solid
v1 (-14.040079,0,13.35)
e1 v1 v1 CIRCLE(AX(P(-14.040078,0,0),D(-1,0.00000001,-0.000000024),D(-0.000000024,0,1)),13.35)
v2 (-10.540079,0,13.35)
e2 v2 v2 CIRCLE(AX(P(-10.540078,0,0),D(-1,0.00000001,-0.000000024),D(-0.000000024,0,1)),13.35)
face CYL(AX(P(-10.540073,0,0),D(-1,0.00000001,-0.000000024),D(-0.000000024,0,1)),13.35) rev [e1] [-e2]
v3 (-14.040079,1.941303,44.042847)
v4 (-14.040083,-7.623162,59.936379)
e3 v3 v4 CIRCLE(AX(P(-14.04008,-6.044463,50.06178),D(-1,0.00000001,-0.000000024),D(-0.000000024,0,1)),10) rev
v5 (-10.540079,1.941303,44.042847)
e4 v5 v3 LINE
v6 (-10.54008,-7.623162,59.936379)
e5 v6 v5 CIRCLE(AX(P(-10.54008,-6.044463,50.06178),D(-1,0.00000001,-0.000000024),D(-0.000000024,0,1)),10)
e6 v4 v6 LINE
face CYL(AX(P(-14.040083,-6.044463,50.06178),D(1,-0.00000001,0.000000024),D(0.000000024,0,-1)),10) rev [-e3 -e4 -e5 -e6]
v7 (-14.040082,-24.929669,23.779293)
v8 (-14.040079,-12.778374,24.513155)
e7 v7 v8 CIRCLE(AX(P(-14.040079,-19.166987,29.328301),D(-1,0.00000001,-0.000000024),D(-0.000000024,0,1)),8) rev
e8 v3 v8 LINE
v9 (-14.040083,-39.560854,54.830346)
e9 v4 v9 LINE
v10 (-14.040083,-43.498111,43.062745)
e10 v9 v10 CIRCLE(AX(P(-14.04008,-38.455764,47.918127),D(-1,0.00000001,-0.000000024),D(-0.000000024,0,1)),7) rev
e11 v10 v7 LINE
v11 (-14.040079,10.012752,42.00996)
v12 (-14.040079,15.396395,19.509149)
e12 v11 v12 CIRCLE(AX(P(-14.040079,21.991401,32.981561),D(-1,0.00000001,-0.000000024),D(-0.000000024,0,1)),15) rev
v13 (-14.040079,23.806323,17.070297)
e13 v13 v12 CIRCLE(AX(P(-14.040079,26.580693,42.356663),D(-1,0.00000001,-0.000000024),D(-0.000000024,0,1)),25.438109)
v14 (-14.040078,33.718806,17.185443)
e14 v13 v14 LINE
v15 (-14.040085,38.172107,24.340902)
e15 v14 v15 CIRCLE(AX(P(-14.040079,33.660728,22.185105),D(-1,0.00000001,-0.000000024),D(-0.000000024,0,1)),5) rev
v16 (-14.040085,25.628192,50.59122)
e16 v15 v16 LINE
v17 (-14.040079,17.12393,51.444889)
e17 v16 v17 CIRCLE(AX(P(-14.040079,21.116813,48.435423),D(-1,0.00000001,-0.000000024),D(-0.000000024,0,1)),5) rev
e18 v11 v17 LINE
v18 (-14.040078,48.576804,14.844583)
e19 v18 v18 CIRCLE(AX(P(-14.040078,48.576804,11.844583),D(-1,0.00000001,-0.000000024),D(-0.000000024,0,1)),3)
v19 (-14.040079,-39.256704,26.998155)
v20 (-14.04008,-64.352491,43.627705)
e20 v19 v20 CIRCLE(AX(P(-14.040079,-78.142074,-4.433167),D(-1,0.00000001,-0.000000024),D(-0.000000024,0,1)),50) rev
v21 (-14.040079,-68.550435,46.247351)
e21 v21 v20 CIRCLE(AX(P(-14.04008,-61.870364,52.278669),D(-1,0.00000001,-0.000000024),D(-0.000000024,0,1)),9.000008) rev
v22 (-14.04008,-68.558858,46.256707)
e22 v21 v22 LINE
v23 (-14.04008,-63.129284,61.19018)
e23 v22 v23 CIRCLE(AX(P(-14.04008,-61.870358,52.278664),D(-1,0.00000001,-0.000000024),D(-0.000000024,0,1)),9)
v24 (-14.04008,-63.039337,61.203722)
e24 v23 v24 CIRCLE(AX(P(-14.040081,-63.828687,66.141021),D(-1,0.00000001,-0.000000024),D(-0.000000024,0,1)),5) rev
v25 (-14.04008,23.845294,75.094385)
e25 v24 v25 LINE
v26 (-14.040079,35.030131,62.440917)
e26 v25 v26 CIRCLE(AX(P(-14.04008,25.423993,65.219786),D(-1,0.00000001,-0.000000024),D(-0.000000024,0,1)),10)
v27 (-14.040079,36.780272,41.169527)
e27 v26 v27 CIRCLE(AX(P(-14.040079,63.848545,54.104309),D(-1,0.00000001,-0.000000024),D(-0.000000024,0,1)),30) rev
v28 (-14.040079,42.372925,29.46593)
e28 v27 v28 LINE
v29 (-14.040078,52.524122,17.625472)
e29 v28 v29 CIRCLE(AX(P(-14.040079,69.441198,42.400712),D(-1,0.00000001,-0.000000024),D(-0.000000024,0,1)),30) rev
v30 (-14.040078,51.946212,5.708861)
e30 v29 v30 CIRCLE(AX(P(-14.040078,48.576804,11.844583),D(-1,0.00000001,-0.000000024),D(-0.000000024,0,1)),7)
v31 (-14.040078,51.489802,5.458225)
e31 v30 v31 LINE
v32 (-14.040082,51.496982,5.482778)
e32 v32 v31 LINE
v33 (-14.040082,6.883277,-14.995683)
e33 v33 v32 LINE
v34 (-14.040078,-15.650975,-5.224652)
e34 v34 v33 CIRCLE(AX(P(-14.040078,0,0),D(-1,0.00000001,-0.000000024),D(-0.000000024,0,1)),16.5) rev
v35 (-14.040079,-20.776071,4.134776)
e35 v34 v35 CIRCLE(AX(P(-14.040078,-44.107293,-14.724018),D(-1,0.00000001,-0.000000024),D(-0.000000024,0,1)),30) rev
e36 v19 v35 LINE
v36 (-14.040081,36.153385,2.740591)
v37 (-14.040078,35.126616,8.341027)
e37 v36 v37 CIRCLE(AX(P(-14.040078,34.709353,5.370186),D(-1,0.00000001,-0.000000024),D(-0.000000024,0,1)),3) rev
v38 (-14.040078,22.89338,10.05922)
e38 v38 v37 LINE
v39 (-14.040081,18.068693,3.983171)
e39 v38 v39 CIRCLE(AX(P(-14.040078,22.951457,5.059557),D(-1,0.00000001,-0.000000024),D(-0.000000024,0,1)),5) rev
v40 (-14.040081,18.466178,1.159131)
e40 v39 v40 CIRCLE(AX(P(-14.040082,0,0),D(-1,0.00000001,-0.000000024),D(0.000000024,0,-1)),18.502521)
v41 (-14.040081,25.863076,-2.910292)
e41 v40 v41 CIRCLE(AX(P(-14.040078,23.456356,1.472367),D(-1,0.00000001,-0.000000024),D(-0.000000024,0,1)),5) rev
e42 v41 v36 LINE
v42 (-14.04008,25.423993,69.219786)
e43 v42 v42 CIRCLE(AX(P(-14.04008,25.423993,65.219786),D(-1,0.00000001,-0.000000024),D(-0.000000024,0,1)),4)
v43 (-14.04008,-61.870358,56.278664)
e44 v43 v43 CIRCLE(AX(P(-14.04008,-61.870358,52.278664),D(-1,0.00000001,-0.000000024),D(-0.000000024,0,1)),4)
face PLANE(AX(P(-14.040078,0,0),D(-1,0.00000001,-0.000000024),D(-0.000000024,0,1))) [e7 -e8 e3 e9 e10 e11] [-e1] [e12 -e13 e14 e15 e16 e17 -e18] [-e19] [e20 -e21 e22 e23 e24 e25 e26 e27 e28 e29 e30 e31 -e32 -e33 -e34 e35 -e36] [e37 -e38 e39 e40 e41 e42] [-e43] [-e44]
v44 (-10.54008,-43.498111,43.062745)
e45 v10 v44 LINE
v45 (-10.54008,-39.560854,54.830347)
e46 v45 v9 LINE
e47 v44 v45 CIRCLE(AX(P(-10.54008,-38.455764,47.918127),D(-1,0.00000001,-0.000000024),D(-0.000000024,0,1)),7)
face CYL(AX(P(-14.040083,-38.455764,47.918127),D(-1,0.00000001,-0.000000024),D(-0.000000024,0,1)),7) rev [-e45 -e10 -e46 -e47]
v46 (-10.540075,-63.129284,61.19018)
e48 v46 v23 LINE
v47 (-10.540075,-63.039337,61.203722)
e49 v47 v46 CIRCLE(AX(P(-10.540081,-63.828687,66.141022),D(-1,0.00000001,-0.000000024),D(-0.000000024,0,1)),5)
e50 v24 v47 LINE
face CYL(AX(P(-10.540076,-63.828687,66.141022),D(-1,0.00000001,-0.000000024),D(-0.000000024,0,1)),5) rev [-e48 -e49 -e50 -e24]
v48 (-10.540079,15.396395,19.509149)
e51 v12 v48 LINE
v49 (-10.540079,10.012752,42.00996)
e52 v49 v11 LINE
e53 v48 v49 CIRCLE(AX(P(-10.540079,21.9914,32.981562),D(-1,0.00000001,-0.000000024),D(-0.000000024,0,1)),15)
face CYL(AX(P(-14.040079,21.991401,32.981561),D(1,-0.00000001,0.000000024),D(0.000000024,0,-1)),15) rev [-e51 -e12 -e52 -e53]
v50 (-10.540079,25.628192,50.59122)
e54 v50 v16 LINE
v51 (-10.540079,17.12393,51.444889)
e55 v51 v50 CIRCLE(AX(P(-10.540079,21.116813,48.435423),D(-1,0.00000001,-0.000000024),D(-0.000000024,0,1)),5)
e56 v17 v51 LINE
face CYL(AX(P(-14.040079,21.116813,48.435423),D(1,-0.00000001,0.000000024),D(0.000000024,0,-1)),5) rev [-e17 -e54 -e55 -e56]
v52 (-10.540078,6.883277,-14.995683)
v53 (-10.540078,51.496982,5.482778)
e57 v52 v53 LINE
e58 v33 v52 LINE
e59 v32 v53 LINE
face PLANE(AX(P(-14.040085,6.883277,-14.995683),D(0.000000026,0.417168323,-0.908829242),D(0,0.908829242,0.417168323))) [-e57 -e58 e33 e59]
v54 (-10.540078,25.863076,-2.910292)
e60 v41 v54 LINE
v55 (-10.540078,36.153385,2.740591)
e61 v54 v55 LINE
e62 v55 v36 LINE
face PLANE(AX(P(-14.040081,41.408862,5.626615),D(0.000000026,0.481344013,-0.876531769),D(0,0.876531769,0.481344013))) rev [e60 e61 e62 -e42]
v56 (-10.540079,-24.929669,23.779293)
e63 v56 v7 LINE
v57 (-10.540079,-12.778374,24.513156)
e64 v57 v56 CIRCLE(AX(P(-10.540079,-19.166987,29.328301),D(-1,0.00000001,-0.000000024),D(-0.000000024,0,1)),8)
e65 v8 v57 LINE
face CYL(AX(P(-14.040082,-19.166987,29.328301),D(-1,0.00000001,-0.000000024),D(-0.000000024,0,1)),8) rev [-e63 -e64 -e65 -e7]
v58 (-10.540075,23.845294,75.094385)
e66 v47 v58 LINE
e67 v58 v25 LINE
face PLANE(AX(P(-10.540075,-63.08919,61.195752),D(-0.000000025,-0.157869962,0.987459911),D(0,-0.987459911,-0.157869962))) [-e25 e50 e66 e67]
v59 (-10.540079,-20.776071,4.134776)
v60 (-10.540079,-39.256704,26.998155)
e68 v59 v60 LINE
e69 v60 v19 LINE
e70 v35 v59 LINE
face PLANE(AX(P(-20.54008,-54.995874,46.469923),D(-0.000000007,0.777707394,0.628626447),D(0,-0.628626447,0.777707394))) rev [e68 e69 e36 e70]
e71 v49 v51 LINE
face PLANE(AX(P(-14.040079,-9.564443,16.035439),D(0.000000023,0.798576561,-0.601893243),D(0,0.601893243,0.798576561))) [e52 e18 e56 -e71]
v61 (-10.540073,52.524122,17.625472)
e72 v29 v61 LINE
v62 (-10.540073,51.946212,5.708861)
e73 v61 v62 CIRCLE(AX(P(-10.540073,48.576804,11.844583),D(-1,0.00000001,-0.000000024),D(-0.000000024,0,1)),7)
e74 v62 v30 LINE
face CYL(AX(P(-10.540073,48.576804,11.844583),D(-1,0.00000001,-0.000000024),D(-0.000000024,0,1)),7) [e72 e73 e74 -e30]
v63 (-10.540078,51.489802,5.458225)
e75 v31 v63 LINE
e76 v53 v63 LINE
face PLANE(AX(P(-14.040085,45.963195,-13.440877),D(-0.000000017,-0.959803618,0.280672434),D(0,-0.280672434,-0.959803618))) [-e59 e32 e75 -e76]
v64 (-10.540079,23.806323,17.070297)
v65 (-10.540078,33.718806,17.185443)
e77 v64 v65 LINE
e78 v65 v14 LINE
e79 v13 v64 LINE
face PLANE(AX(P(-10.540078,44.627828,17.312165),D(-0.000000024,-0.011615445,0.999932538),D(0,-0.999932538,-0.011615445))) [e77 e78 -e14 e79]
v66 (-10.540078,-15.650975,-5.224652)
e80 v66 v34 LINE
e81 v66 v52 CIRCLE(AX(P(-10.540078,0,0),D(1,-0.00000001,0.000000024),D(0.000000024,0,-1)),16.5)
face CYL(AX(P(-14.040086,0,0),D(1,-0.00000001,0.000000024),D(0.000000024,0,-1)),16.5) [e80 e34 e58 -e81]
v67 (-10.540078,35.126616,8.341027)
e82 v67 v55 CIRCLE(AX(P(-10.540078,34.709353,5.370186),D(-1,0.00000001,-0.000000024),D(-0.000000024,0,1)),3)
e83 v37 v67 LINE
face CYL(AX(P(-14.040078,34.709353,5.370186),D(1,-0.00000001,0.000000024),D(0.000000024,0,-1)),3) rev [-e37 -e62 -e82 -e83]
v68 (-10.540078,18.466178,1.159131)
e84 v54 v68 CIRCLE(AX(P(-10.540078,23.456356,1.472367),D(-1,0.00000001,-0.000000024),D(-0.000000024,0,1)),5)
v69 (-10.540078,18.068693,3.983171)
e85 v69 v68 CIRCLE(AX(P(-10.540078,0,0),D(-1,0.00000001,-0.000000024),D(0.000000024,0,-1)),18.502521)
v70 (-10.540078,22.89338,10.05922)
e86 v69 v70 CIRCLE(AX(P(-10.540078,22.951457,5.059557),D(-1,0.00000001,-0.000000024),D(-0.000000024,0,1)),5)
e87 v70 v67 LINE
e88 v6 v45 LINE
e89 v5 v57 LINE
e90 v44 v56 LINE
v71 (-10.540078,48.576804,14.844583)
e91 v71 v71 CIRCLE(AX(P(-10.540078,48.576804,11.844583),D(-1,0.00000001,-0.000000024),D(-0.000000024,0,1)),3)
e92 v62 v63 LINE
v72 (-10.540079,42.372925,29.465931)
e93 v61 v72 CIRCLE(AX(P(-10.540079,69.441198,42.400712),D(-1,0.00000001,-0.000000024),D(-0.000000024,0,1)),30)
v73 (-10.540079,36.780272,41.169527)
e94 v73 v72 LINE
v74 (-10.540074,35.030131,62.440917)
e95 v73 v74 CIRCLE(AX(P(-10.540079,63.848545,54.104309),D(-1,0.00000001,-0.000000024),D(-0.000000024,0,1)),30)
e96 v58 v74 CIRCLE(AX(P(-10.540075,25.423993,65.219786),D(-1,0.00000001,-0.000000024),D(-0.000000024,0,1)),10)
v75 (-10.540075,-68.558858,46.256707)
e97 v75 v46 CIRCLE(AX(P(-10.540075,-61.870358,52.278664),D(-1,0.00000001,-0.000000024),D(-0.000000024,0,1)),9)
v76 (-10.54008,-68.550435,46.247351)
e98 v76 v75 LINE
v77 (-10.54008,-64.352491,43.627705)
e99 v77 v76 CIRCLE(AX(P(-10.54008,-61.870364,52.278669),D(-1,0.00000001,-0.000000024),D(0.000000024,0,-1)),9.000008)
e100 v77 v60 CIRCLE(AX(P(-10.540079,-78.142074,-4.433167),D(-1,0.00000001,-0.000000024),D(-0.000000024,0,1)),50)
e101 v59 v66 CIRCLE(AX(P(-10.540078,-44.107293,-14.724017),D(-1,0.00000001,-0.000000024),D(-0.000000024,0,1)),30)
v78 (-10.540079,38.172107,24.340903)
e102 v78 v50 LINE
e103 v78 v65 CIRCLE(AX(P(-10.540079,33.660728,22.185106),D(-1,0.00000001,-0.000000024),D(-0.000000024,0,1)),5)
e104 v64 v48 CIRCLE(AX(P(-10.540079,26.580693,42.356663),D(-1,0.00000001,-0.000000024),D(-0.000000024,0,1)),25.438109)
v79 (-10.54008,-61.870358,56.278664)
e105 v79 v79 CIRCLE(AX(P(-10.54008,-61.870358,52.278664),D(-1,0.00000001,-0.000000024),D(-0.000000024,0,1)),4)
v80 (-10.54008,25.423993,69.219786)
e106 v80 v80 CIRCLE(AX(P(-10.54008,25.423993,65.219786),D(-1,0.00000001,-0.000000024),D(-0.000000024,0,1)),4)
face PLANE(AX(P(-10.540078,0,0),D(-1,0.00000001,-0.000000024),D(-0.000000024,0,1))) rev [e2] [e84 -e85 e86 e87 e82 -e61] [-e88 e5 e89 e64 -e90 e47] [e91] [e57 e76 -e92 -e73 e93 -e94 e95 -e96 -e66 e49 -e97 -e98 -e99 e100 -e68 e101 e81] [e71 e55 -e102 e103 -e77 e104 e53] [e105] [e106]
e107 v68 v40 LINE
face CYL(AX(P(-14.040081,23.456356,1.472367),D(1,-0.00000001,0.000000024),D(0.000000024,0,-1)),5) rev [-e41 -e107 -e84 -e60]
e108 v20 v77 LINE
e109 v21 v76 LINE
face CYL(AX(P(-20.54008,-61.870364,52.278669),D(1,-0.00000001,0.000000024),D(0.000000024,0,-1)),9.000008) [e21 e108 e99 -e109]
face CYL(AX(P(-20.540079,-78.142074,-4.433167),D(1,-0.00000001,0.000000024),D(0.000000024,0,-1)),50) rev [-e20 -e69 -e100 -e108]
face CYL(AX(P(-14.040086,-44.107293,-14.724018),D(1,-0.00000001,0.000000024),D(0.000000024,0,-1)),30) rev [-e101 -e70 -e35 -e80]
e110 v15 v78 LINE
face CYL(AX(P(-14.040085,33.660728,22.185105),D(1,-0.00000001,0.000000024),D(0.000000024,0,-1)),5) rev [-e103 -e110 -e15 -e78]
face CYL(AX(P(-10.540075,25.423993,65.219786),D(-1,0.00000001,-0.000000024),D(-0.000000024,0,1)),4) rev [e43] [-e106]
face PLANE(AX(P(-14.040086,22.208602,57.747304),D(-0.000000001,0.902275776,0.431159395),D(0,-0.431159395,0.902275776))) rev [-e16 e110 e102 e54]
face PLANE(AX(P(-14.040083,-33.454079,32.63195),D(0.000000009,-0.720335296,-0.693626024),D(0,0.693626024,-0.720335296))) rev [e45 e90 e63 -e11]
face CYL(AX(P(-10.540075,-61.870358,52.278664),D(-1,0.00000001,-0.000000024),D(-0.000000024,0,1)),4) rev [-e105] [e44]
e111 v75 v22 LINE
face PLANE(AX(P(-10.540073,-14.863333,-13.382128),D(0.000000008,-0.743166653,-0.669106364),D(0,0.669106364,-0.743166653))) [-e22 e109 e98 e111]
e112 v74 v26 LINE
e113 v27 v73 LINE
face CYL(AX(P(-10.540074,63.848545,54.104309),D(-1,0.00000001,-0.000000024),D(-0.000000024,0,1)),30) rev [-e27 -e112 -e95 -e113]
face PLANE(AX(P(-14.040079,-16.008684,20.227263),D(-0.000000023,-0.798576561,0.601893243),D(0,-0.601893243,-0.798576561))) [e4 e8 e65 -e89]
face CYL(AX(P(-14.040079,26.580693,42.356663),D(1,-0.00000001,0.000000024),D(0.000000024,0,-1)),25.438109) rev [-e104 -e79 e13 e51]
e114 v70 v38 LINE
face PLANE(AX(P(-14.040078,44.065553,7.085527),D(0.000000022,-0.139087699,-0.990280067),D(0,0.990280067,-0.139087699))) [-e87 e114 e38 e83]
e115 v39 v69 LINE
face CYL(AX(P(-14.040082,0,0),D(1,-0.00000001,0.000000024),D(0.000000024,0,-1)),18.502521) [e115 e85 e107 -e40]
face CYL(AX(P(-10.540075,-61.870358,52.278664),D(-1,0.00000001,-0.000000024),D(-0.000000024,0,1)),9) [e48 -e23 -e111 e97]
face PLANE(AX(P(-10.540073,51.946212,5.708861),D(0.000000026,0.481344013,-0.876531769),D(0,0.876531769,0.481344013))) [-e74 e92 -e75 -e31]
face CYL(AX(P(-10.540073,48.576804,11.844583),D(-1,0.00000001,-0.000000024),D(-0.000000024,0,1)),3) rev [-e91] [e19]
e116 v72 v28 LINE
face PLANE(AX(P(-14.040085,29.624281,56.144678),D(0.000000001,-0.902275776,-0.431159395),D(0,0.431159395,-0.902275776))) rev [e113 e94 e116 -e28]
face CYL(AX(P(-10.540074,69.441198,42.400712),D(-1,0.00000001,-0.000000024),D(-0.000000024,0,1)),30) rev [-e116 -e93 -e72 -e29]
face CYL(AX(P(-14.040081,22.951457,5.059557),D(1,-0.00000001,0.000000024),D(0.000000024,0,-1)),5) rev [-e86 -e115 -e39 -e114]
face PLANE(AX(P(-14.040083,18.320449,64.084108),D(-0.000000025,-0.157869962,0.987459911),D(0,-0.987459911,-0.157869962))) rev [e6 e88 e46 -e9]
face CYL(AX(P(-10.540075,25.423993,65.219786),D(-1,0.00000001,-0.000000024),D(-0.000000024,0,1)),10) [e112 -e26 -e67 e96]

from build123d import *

# Parameters (mm, degrees)
SZKIC7_W                    = 139.266717109
SZKIC7_H                    = 160.929145335
DODANIE_WYCI_GNI_CIE2_DEPTH = 3.5
SZKIC8_R                    = 13.35
SZKIC8_R_2                  = 3
SZKIC8_R_3                  = 4
WYTNIJ_WYCI_GNI_CIE4_DEPTH  = 129.67294198
SZKIC9_W                    = 153.512733411
SZKIC9_H                    = 228.238191402
WYTNIJ_WYCI_GNI_CIE5_DEPTH  = 129.67294198
WYTNIJ_WYCI_GNI_CIE14_DEPTH = 104.40635377
WYTNIJ_WYCI_GNI_CIE15_DEPTH = 104.40635377
ZAOKR_GLENIE11_R            = 30
DODANIE_WYCI_GNI_CIE5_DEPTH = 3.5
ZAOKR_GLENIE14_R            = 5
WYTNIJ_WYCI_GNI_CIE17_DEPTH = 104.40635377
DODANIE_WYCI_GNI_CIE6_DEPTH = 3.5
ZAOKR_GLENIE24_R            = 5
DODANIE_WYCI_GNI_CIE7_DEPTH = 3.5
WYTNIJ_WYCI_GNI_CIE19_START = -10
WYTNIJ_WYCI_GNI_CIE19_DEPTH = 10
ZAOKR_GLENIE45_R            = 50
ZAOKR_GLENIE46_R            = 5
ZAOKR_GLENIE49_R            = 7
DODANIE_WYCI_GNI_CIE8_DEPTH = 3.5
ZAOKR_GLENIE61_R            = 3
ZAOKR_GLENIE62_R            = 5
WYTNIJ_WYCI_GNI_CIE21_DEPTH = 104.40635377
ZAOKR_GLENIE69_R            = 30
ZAOKR_GLENIE72_R            = 10
ZAOKR_GLENIE75_R            = 5
ZAOKR_GLENIE76_R            = 8
ZAOKR_GLENIE77_R            = 15


with BuildPart() as part:
    # Szkic7 → Dodanie-wyciągnięcie2 (new body)
    with BuildSketch(Plane(origin=(-10.54007835, 1.1e-07, -2.52e-07), x_dir=(-2.3878901828089376e-08, 0, 0.9999999999999998), z_dir=(-0.9999999999999998, 1.0404070824565065e-08, -2.387890182808938e-08))):
        with Locations((21.253283054, -10.552427612)):
            Rectangle(SZKIC7_W, SZKIC7_H)
    extrude(amount=DODANIE_WYCI_GNI_CIE2_DEPTH)

    # Szkic8 → Wytnij-wyciągnięcie4 (cut, through all)
    with BuildSketch(Plane(origin=(-14.04007835, 1.46e-07, -3.35e-07), x_dir=(-2.3878901828089376e-08, 0, 0.9999999999999998), z_dir=(-0.9999999999999998, 1.0404070821366677e-08, -2.387890182808938e-08))):
        Circle(SZKIC8_R)
        with Locations((11.844583319, 48.576803579)):
            Circle(SZKIC8_R_2)
        with Locations((65.219786586, 25.423993346)):
            Circle(SZKIC8_R_3)
        with Locations((52.278664472, -61.870358339)):
            Circle(SZKIC8_R_3)
    extrude(amount=-WYTNIJ_WYCI_GNI_CIE4_DEPTH, mode=Mode.SUBTRACT)

    # Szkic9 → Wytnij-wyciągnięcie5 (cut, through all)
    with BuildSketch(Plane(origin=(-14.04007835, 1.46e-07, -3.35e-07), x_dir=(-2.3878901828089376e-08, 0, 0.9999999999999998), z_dir=(-0.9999999999999998, 1.04040708213667e-08, -2.387890182808938e-08))):
        with Locations((22.662126008, 15.447874068)):
            Rectangle(SZKIC9_W, SZKIC9_H)
        with BuildLine():
            Line((-13.382127281, -14.863333052), (46.256707196, -68.558858213))
            ThreePointArc((46.256707196, -68.558858213), (55.372975766, -70.321703653), (61.195751969, -63.089189983))
            Line((61.195751969, -63.089189983), (75.094385693, 23.845293729))
            ThreePointArc((75.094385693, 23.845293729), (73.861369629, 30.456193909), (68.720255549, 34.79131511))
            Line((68.720255549, 34.79131511), (14.519431503, 55.045589184))
            ThreePointArc((14.519431503, 55.045589184), (9.521665371, 55.180140024), (5.708860939, 51.946211669))
            Line((5.708860939, 51.946211669), (-17.530635372, 9.626880256))
            ThreePointArc((-17.530635372, 9.626880256), (-19.719086203, -3.340305273), (-13.382127281, -14.863333052))
        make_face(mode=Mode.SUBTRACT)
    extrude(amount=-WYTNIJ_WYCI_GNI_CIE5_DEPTH, mode=Mode.SUBTRACT)

    # Szkic14 → Wytnij-wyciągnięcie14 (cut, through all)
    with BuildSketch(Plane(origin=(-10.54007835, 1.1e-07, -2.52e-07), x_dir=(2.3878901828089376e-08, 0, -0.9999999999999998), z_dir=(0.9999999999999998, -1.0404070821258326e-08, 2.387890182808938e-08))):
        with BuildLine():
            Line((-64.084108782, 18.320448812), (-52.714951988, -52.792424274))
            Line((-52.714951988, -52.792424274), (-32.631950605, -33.45407936))
            Line((-32.631950605, -33.45407936), (-18.993828244, -20.321644163))
            Line((-18.993828244, -20.321644163), (-23.497433394, -7.529972113))
            ThreePointArc((-23.497433394, -7.529972113), (-20.22176145, 0.243476392), (-16.722321984, 7.918790833))
            ThreePointArc((-16.722321984, 7.918790833), (-6.217208555, 17.426692703), (7.933812077, 16.715200469))
            Line((7.933812077, 16.715200469), (0.329933976, 30.561930754))
            Line((0.329933976, 30.561930754), (-5.626615834, 41.408861433))
            Line((-5.626615834, 41.408861433), (-64.084108782, 18.320448812))
        make_face()
    extrude(amount=-WYTNIJ_WYCI_GNI_CIE14_DEPTH, mode=Mode.SUBTRACT)

    # Szkic18 → Wytnij-wyciągnięcie15 (cut, through all)
    with BuildSketch(Plane(origin=(-10.54007835, 1.1e-07, -2.52e-07), x_dir=(2.3878901833219947e-08, 0, -0.9999999999999997), z_dir=(0.9999999999999997, -1.0404070824107121e-08, 2.3878901833219954e-08))):
        with BuildLine():
            Line((-56.144678545, 29.624280722), (-18.759552018, 47.489049981))
            ThreePointArc((-18.759552018, 47.489049981), (-17.902798902, 52.083657433), (-14.345263169, 55.114892007))
            Line((-14.345263169, 55.114892007), (-18.275031936, 65.389368248))
            Line((-18.275031936, 65.389368248), (-73.458270167, 44.282952603))
            Line((-73.458270167, 44.282952603), (-68.840695847, 34.74542114))
            ThreePointArc((-68.840695847, 34.74542114), (-61.478985752, 34.697957391), (-56.144678545, 29.624280722))
        make_face()
    extrude(amount=-WYTNIJ_WYCI_GNI_CIE15_DEPTH, mode=Mode.SUBTRACT)

    # Zaokrąglenie11
    zaokr_glenie11_edges = [part.edges().sort_by_distance(p)[0] for p in [
        (-12.290078304, 47.489050108, 18.759551724),
        (-12.290079383, 29.62428085, 56.144678252),
    ]]
    fillet(zaokr_glenie11_edges, radius=ZAOKR_GLENIE11_R)

    # Szkic19 → Dodanie-wyciągnięcie5 (add)
    with BuildSketch(Plane(origin=(-10.54007835, 1.1e-07, -2.52e-07), x_dir=(2.3878901833219947e-08, 0, -0.9999999999999997), z_dir=(0.9999999999999997, -1.0404070824107115e-08, 2.3878901833219954e-08))):
        Polygon((-58.946047974, 22.777610248), (-66.322773152, 19.747008618), (-66.720640825, 19.033728733), (-20.22726344, -16.008684341), (-16.035438929, -9.564443008), align=None)
    extrude(amount=-DODANIE_WYCI_GNI_CIE5_DEPTH)

    # Zaokrąglenie14
    zaokr_glenie14_edges = [part.edges().sort_by_distance(p)[0] for p in [
        (-12.290077987, 16.715200597, -7.93381237),
    ]]
    fillet(zaokr_glenie14_edges, radius=ZAOKR_GLENIE14_R)

    # Szkic21 → Wytnij-wyciągnięcie17 (cut, through all)
    with BuildSketch(Plane(origin=(-10.54007835, 1.1e-07, -2.52e-07), x_dir=(2.3878901833219947e-08, 0, -0.9999999999999997), z_dir=(0.9999999999999997, -1.0404070824107095e-08, 2.3878901833219954e-08))):
        with BuildLine():
            Line((-57.747304238, 22.208602164), (-14.808308197, 42.727330539))
            ThreePointArc((-14.808308197, 42.727330539), (-10.724979425, 42.115651428), (-7.085527385, 44.065552465))
            Line((-7.085527385, 44.065552465), (-5.626615834, 41.408861433))
            Line((-5.626615834, 41.408861433), (-56.83244455, 21.184571229))
            Line((-56.83244455, 21.184571229), (-58.018162719, 22.09497171))
            Line((-58.018162719, 22.09497171), (-57.747304238, 22.208602164))
        make_face()
    extrude(amount=-WYTNIJ_WYCI_GNI_CIE17_DEPTH, mode=Mode.SUBTRACT)

    # Szkic22 → Dodanie-wyciągnięcie6 (add)
    with BuildSketch(Plane(origin=(-14.04007835, 1.46e-07, -3.35e-07), x_dir=(-2.3878901833219947e-08, 0, 0.9999999999999997), z_dir=(-0.9999999999999997, 1.0404070824107088e-08, -2.3878901833219954e-08))):
        Polygon((17.312164793, 44.627828311), (16.881727623, 7.573016126), (9.920276091, 10.932172716), (10.31169253, 44.627828311), align=None)
    extrude(amount=-DODANIE_WYCI_GNI_CIE6_DEPTH)

    # Zaokrąglenie24
    zaokr_glenie24_edges = [part.edges().sort_by_distance(p)[0] for p in [
        (-12.290078426, 15.583851379, 9.974310759),
    ]]
    fillet(zaokr_glenie24_edges, radius=ZAOKR_GLENIE24_R)

    # Szkic24 → Dodanie-wyciągnięcie7 (add)
    with BuildSketch(Plane(origin=(-10.54007835, 1.1e-07, -2.52e-07), x_dir=(2.3878901833219947e-08, 0, -0.9999999999999997), z_dir=(0.9999999999999997, -1.0404070824107058e-08, 2.3878901833219954e-08))):
        with BuildLine():
            Line((-36.816395524, 1.75323141), (-22.747516876, -7.1896775))
            Line((-22.747516876, -7.1896775), (-16.897223685, -9.883462439))
            Line((-16.897223685, -9.883462439), (-13.267833736, 11.506726098))
            Line((-13.267833736, 11.506726098), (-17.070297429, 23.806323206))
            ThreePointArc((-17.070297429, 23.806323206), (-23.405276733, 9.611828212), (-36.816395524, 1.75323141))
        make_face()
    extrude(amount=-DODANIE_WYCI_GNI_CIE7_DEPTH)

    # Szkic15 → Wytnij-wyciągnięcie19 (cut)
    with BuildSketch(Plane(origin=(-10.54007835, 1.1e-07, -2.52e-07), x_dir=(2.3878901833219947e-08, 0, -0.9999999999999997), z_dir=(0.9999999999999997, -1.040407082410717e-08, 2.3878901833219954e-08)).offset(WYTNIJ_WYCI_GNI_CIE19_START)):
        with BuildLine():
            Line((-46.247351401, -68.55043477), (13.382127281, -14.863333052))
            ThreePointArc((13.382127281, -14.863333052), (5.78541375, -19.144946794), (-2.911139806, -19.786997373))
            Line((-2.911139806, -19.786997373), (-46.469923975, -54.995874079))
            ThreePointArc((-46.469923975, -54.995874079), (-43.279874823, -61.722599619), (-46.247351401, -68.55043477))
        make_face()
    extrude(amount=WYTNIJ_WYCI_GNI_CIE19_DEPTH, mode=Mode.SUBTRACT)

    # Zaokrąglenie45
    zaokr_glenie45_edges = [part.edges().sort_by_distance(p)[0] for p in [
        (-12.290080032, -54.995873951, 46.469923682),
    ]]
    fillet(zaokr_glenie45_edges, radius=ZAOKR_GLENIE45_R)

    # Zaokrąglenie46
    # the kernel refuses this fillet: 5 mm, written as the material it adds along each edge
    with BuildSketch(Plane(origin=(-14.040080468, -63.089189837, 61.195751634), x_dir=(-7.0180139349827484e-09, -0.9904804440406619, -0.13765351420509783), z_dir=(0.9999999999999997, -1.04040708213667e-08, 2.3878901828089376e-08))) as zaokr_glenie46_piece_1:
        with BuildLine():
            CenterArc((0.051723223, -4.999987357), ZAOKR_GLENIE46_R, 90.128848909, 1.042345949)
            Line((-0.050475691, -0.001031928), (0, 0))
            ThreePointArc((0, 0), (0.020239522, -2.2758e-05), (0.040479044, 0))
        make_face()
    extrude(amount=3.5)

    # Zaokrąglenie49
    zaokr_glenie49_edges = [part.edges().sort_by_distance(p)[0] for p in [
        (-12.290080158, -52.792424146, 52.714951695),
    ]]
    fillet(zaokr_glenie49_edges, radius=ZAOKR_GLENIE49_R)

    # Szkic26 → Dodanie-wyciągnięcie8 (add)
    with BuildSketch(Plane(origin=(-10.54007835, 1.1e-07, -2.52e-07), x_dir=(2.3878901833219947e-08, 0, -0.9999999999999997), z_dir=(0.9999999999999997, -1.0404070824107146e-08, 2.3878901833219954e-08))):
        Polygon((-7.085527385, 44.065552465), (-10.059220211, 22.893380097), (-14.304391944, 31.138416493), (-12.581544758, 43.40478687), align=None)
    extrude(amount=-DODANIE_WYCI_GNI_CIE8_DEPTH)

    # Zaokrąglenie61
    zaokr_glenie61_edges = [part.edges().sort_by_distance(p)[0] for p in [
        (-12.290078061, 44.065552593, 7.085527092),
    ]]
    fillet(zaokr_glenie61_edges, radius=ZAOKR_GLENIE61_R)

    # Zaokrąglenie62
    zaokr_glenie62_edges = [part.edges().sort_by_distance(p)[0] for p in [
        (-12.290078331, 41.547939767, 17.276387809),
    ]]
    fillet(zaokr_glenie62_edges, radius=ZAOKR_GLENIE62_R)

    # Szkic28 → Wytnij-wyciągnięcie21 (cut, through all)
    with BuildSketch(Plane(origin=(-10.54007835, 1.1e-07, -2.52e-07), x_dir=(2.3878901833219947e-08, 0, -0.9999999999999997), z_dir=(0.9999999999999997, -1.0404070824107156e-08, 2.3878901833219954e-08))):
        with BuildLine():
            Line((-5.482778627, 51.496981839), (14.995682487, 6.883277326))
            ThreePointArc((14.995682487, 6.883277326), (14.189845026, -8.420112715), (1.143833134, -16.460305154))
            Line((1.143833134, -16.460305154), (-2.911139806, -19.786997373))
            ThreePointArc((-2.911139806, -19.786997373), (16.423351118, -11.413743385), (17.530635372, 9.626880256))
            Line((17.530635372, 9.626880256), (-5.458225211, 51.489801759))
            Line((-5.458225211, 51.489801759), (-5.482778627, 51.496981839))
        make_face()
    extrude(amount=-WYTNIJ_WYCI_GNI_CIE21_DEPTH, mode=Mode.SUBTRACT)

    # Zaokrąglenie69
    zaokr_glenie69_edges = [part.edges().sort_by_distance(p)[0] for p in [
        (-12.290078494, -16.460305026, -1.143833428),
    ]]
    fillet(zaokr_glenie69_edges, radius=ZAOKR_GLENIE69_R)

    # Zaokrąglenie72
    # the kernel refuses this fillet: 10 mm, written as the material it adds along each edge
    with BuildSketch(Plane(origin=(-10.540079015, -20.321644054, 18.993827992), x_dir=(-2.4417350092824874e-08, -0.6936260242852466, 0.7203352958409311), z_dir=(-0.9999999999999998, 1.0404070821258326e-08, -2.387890182808938e-08))) as zaokr_glenie72_piece_1:
        with BuildLine():
            CenterArc((6.286783652, 10), ZAOKR_GLENIE72_R, 213.765114836, 56.234885164)
            Line((-2.026446567, 4.442104416), (-2.192711171, 4.330946504))
            ThreePointArc((-2.192711171, 4.330946504), (-1.195183636, 2.138043594), (-0.181960353, -0.083008614))
            Line((-0.181960353, -0.083008614), (0, -0.2))
            Line((0, -0.2), (6.286783652, -0.2))
            Line((6.286783652, -0.2), (6.286783652, 0))
        make_face()
    extrude(amount=3.5)
    with BuildSketch(Plane(origin=(-14.0400797, 16.872020607, 63.852541245), x_dir=(-6.503841534045875e-09, -0.9874599106733049, -0.1578699617187155), z_dir=(0.9999999999999997, -1.0404070828894181e-08, 2.38789018268686e-08))) as zaokr_glenie72_piece_2:
        with BuildLine():
            CenterArc((ZAOKR_GLENIE72_R * 2.4806255413, ZAOKR_GLENIE72_R), ZAOKR_GLENIE72_R, 133.911105356, 136.088894644)
            Line((ZAOKR_GLENIE72_R * 1.78708406522, ZAOKR_GLENIE72_R * 1.72041669952), (ZAOKR_GLENIE72_R * 1.7732132357, ZAOKR_GLENIE72_R * 1.73482503351))
            Line((ZAOKR_GLENIE72_R * 1.7732132357, ZAOKR_GLENIE72_R * 1.73482503351), (-ZAOKR_GLENIE72_R * 0.0138708295217, ZAOKR_GLENIE72_R * 0.0144083339905))
            Line((-ZAOKR_GLENIE72_R * 0.0138708295217, ZAOKR_GLENIE72_R * 0.0144083339905), (0, -ZAOKR_GLENIE72_R * 0.02))
            Line((0, -ZAOKR_GLENIE72_R * 0.02), (ZAOKR_GLENIE72_R * 2.4806255413, -ZAOKR_GLENIE72_R * 0.02))
            Line((ZAOKR_GLENIE72_R * 2.4806255413, -ZAOKR_GLENIE72_R * 0.02), (ZAOKR_GLENIE72_R * 2.4806255413, 0))
        make_face()
    extrude(amount=3.5)

    # Zaokrąglenie75
    zaokr_glenie75_edges = [part.edges().sort_by_distance(p)[0] for p in [
        (-12.290079506, 22.094971838, 58.018162426),
    ]]
    fillet(zaokr_glenie75_edges, radius=ZAOKR_GLENIE75_R)

    # Zaokrąglenie76
    zaokr_glenie76_edges = [part.edges().sort_by_distance(p)[0] for p in [
        (-12.290079006, -15.716243361, 20.615266189),
    ]]
    fillet(zaokr_glenie76_edges, radius=ZAOKR_GLENIE76_R)

    # Zaokrąglenie77
    zaokr_glenie77_edges = [part.edges().sort_by_distance(p)[0] for p in [
        (-12.290079101, 3.02881083, 32.74384556),
    ]]
    fillet(zaokr_glenie77_edges, radius=ZAOKR_GLENIE77_R)


solid = part.part
